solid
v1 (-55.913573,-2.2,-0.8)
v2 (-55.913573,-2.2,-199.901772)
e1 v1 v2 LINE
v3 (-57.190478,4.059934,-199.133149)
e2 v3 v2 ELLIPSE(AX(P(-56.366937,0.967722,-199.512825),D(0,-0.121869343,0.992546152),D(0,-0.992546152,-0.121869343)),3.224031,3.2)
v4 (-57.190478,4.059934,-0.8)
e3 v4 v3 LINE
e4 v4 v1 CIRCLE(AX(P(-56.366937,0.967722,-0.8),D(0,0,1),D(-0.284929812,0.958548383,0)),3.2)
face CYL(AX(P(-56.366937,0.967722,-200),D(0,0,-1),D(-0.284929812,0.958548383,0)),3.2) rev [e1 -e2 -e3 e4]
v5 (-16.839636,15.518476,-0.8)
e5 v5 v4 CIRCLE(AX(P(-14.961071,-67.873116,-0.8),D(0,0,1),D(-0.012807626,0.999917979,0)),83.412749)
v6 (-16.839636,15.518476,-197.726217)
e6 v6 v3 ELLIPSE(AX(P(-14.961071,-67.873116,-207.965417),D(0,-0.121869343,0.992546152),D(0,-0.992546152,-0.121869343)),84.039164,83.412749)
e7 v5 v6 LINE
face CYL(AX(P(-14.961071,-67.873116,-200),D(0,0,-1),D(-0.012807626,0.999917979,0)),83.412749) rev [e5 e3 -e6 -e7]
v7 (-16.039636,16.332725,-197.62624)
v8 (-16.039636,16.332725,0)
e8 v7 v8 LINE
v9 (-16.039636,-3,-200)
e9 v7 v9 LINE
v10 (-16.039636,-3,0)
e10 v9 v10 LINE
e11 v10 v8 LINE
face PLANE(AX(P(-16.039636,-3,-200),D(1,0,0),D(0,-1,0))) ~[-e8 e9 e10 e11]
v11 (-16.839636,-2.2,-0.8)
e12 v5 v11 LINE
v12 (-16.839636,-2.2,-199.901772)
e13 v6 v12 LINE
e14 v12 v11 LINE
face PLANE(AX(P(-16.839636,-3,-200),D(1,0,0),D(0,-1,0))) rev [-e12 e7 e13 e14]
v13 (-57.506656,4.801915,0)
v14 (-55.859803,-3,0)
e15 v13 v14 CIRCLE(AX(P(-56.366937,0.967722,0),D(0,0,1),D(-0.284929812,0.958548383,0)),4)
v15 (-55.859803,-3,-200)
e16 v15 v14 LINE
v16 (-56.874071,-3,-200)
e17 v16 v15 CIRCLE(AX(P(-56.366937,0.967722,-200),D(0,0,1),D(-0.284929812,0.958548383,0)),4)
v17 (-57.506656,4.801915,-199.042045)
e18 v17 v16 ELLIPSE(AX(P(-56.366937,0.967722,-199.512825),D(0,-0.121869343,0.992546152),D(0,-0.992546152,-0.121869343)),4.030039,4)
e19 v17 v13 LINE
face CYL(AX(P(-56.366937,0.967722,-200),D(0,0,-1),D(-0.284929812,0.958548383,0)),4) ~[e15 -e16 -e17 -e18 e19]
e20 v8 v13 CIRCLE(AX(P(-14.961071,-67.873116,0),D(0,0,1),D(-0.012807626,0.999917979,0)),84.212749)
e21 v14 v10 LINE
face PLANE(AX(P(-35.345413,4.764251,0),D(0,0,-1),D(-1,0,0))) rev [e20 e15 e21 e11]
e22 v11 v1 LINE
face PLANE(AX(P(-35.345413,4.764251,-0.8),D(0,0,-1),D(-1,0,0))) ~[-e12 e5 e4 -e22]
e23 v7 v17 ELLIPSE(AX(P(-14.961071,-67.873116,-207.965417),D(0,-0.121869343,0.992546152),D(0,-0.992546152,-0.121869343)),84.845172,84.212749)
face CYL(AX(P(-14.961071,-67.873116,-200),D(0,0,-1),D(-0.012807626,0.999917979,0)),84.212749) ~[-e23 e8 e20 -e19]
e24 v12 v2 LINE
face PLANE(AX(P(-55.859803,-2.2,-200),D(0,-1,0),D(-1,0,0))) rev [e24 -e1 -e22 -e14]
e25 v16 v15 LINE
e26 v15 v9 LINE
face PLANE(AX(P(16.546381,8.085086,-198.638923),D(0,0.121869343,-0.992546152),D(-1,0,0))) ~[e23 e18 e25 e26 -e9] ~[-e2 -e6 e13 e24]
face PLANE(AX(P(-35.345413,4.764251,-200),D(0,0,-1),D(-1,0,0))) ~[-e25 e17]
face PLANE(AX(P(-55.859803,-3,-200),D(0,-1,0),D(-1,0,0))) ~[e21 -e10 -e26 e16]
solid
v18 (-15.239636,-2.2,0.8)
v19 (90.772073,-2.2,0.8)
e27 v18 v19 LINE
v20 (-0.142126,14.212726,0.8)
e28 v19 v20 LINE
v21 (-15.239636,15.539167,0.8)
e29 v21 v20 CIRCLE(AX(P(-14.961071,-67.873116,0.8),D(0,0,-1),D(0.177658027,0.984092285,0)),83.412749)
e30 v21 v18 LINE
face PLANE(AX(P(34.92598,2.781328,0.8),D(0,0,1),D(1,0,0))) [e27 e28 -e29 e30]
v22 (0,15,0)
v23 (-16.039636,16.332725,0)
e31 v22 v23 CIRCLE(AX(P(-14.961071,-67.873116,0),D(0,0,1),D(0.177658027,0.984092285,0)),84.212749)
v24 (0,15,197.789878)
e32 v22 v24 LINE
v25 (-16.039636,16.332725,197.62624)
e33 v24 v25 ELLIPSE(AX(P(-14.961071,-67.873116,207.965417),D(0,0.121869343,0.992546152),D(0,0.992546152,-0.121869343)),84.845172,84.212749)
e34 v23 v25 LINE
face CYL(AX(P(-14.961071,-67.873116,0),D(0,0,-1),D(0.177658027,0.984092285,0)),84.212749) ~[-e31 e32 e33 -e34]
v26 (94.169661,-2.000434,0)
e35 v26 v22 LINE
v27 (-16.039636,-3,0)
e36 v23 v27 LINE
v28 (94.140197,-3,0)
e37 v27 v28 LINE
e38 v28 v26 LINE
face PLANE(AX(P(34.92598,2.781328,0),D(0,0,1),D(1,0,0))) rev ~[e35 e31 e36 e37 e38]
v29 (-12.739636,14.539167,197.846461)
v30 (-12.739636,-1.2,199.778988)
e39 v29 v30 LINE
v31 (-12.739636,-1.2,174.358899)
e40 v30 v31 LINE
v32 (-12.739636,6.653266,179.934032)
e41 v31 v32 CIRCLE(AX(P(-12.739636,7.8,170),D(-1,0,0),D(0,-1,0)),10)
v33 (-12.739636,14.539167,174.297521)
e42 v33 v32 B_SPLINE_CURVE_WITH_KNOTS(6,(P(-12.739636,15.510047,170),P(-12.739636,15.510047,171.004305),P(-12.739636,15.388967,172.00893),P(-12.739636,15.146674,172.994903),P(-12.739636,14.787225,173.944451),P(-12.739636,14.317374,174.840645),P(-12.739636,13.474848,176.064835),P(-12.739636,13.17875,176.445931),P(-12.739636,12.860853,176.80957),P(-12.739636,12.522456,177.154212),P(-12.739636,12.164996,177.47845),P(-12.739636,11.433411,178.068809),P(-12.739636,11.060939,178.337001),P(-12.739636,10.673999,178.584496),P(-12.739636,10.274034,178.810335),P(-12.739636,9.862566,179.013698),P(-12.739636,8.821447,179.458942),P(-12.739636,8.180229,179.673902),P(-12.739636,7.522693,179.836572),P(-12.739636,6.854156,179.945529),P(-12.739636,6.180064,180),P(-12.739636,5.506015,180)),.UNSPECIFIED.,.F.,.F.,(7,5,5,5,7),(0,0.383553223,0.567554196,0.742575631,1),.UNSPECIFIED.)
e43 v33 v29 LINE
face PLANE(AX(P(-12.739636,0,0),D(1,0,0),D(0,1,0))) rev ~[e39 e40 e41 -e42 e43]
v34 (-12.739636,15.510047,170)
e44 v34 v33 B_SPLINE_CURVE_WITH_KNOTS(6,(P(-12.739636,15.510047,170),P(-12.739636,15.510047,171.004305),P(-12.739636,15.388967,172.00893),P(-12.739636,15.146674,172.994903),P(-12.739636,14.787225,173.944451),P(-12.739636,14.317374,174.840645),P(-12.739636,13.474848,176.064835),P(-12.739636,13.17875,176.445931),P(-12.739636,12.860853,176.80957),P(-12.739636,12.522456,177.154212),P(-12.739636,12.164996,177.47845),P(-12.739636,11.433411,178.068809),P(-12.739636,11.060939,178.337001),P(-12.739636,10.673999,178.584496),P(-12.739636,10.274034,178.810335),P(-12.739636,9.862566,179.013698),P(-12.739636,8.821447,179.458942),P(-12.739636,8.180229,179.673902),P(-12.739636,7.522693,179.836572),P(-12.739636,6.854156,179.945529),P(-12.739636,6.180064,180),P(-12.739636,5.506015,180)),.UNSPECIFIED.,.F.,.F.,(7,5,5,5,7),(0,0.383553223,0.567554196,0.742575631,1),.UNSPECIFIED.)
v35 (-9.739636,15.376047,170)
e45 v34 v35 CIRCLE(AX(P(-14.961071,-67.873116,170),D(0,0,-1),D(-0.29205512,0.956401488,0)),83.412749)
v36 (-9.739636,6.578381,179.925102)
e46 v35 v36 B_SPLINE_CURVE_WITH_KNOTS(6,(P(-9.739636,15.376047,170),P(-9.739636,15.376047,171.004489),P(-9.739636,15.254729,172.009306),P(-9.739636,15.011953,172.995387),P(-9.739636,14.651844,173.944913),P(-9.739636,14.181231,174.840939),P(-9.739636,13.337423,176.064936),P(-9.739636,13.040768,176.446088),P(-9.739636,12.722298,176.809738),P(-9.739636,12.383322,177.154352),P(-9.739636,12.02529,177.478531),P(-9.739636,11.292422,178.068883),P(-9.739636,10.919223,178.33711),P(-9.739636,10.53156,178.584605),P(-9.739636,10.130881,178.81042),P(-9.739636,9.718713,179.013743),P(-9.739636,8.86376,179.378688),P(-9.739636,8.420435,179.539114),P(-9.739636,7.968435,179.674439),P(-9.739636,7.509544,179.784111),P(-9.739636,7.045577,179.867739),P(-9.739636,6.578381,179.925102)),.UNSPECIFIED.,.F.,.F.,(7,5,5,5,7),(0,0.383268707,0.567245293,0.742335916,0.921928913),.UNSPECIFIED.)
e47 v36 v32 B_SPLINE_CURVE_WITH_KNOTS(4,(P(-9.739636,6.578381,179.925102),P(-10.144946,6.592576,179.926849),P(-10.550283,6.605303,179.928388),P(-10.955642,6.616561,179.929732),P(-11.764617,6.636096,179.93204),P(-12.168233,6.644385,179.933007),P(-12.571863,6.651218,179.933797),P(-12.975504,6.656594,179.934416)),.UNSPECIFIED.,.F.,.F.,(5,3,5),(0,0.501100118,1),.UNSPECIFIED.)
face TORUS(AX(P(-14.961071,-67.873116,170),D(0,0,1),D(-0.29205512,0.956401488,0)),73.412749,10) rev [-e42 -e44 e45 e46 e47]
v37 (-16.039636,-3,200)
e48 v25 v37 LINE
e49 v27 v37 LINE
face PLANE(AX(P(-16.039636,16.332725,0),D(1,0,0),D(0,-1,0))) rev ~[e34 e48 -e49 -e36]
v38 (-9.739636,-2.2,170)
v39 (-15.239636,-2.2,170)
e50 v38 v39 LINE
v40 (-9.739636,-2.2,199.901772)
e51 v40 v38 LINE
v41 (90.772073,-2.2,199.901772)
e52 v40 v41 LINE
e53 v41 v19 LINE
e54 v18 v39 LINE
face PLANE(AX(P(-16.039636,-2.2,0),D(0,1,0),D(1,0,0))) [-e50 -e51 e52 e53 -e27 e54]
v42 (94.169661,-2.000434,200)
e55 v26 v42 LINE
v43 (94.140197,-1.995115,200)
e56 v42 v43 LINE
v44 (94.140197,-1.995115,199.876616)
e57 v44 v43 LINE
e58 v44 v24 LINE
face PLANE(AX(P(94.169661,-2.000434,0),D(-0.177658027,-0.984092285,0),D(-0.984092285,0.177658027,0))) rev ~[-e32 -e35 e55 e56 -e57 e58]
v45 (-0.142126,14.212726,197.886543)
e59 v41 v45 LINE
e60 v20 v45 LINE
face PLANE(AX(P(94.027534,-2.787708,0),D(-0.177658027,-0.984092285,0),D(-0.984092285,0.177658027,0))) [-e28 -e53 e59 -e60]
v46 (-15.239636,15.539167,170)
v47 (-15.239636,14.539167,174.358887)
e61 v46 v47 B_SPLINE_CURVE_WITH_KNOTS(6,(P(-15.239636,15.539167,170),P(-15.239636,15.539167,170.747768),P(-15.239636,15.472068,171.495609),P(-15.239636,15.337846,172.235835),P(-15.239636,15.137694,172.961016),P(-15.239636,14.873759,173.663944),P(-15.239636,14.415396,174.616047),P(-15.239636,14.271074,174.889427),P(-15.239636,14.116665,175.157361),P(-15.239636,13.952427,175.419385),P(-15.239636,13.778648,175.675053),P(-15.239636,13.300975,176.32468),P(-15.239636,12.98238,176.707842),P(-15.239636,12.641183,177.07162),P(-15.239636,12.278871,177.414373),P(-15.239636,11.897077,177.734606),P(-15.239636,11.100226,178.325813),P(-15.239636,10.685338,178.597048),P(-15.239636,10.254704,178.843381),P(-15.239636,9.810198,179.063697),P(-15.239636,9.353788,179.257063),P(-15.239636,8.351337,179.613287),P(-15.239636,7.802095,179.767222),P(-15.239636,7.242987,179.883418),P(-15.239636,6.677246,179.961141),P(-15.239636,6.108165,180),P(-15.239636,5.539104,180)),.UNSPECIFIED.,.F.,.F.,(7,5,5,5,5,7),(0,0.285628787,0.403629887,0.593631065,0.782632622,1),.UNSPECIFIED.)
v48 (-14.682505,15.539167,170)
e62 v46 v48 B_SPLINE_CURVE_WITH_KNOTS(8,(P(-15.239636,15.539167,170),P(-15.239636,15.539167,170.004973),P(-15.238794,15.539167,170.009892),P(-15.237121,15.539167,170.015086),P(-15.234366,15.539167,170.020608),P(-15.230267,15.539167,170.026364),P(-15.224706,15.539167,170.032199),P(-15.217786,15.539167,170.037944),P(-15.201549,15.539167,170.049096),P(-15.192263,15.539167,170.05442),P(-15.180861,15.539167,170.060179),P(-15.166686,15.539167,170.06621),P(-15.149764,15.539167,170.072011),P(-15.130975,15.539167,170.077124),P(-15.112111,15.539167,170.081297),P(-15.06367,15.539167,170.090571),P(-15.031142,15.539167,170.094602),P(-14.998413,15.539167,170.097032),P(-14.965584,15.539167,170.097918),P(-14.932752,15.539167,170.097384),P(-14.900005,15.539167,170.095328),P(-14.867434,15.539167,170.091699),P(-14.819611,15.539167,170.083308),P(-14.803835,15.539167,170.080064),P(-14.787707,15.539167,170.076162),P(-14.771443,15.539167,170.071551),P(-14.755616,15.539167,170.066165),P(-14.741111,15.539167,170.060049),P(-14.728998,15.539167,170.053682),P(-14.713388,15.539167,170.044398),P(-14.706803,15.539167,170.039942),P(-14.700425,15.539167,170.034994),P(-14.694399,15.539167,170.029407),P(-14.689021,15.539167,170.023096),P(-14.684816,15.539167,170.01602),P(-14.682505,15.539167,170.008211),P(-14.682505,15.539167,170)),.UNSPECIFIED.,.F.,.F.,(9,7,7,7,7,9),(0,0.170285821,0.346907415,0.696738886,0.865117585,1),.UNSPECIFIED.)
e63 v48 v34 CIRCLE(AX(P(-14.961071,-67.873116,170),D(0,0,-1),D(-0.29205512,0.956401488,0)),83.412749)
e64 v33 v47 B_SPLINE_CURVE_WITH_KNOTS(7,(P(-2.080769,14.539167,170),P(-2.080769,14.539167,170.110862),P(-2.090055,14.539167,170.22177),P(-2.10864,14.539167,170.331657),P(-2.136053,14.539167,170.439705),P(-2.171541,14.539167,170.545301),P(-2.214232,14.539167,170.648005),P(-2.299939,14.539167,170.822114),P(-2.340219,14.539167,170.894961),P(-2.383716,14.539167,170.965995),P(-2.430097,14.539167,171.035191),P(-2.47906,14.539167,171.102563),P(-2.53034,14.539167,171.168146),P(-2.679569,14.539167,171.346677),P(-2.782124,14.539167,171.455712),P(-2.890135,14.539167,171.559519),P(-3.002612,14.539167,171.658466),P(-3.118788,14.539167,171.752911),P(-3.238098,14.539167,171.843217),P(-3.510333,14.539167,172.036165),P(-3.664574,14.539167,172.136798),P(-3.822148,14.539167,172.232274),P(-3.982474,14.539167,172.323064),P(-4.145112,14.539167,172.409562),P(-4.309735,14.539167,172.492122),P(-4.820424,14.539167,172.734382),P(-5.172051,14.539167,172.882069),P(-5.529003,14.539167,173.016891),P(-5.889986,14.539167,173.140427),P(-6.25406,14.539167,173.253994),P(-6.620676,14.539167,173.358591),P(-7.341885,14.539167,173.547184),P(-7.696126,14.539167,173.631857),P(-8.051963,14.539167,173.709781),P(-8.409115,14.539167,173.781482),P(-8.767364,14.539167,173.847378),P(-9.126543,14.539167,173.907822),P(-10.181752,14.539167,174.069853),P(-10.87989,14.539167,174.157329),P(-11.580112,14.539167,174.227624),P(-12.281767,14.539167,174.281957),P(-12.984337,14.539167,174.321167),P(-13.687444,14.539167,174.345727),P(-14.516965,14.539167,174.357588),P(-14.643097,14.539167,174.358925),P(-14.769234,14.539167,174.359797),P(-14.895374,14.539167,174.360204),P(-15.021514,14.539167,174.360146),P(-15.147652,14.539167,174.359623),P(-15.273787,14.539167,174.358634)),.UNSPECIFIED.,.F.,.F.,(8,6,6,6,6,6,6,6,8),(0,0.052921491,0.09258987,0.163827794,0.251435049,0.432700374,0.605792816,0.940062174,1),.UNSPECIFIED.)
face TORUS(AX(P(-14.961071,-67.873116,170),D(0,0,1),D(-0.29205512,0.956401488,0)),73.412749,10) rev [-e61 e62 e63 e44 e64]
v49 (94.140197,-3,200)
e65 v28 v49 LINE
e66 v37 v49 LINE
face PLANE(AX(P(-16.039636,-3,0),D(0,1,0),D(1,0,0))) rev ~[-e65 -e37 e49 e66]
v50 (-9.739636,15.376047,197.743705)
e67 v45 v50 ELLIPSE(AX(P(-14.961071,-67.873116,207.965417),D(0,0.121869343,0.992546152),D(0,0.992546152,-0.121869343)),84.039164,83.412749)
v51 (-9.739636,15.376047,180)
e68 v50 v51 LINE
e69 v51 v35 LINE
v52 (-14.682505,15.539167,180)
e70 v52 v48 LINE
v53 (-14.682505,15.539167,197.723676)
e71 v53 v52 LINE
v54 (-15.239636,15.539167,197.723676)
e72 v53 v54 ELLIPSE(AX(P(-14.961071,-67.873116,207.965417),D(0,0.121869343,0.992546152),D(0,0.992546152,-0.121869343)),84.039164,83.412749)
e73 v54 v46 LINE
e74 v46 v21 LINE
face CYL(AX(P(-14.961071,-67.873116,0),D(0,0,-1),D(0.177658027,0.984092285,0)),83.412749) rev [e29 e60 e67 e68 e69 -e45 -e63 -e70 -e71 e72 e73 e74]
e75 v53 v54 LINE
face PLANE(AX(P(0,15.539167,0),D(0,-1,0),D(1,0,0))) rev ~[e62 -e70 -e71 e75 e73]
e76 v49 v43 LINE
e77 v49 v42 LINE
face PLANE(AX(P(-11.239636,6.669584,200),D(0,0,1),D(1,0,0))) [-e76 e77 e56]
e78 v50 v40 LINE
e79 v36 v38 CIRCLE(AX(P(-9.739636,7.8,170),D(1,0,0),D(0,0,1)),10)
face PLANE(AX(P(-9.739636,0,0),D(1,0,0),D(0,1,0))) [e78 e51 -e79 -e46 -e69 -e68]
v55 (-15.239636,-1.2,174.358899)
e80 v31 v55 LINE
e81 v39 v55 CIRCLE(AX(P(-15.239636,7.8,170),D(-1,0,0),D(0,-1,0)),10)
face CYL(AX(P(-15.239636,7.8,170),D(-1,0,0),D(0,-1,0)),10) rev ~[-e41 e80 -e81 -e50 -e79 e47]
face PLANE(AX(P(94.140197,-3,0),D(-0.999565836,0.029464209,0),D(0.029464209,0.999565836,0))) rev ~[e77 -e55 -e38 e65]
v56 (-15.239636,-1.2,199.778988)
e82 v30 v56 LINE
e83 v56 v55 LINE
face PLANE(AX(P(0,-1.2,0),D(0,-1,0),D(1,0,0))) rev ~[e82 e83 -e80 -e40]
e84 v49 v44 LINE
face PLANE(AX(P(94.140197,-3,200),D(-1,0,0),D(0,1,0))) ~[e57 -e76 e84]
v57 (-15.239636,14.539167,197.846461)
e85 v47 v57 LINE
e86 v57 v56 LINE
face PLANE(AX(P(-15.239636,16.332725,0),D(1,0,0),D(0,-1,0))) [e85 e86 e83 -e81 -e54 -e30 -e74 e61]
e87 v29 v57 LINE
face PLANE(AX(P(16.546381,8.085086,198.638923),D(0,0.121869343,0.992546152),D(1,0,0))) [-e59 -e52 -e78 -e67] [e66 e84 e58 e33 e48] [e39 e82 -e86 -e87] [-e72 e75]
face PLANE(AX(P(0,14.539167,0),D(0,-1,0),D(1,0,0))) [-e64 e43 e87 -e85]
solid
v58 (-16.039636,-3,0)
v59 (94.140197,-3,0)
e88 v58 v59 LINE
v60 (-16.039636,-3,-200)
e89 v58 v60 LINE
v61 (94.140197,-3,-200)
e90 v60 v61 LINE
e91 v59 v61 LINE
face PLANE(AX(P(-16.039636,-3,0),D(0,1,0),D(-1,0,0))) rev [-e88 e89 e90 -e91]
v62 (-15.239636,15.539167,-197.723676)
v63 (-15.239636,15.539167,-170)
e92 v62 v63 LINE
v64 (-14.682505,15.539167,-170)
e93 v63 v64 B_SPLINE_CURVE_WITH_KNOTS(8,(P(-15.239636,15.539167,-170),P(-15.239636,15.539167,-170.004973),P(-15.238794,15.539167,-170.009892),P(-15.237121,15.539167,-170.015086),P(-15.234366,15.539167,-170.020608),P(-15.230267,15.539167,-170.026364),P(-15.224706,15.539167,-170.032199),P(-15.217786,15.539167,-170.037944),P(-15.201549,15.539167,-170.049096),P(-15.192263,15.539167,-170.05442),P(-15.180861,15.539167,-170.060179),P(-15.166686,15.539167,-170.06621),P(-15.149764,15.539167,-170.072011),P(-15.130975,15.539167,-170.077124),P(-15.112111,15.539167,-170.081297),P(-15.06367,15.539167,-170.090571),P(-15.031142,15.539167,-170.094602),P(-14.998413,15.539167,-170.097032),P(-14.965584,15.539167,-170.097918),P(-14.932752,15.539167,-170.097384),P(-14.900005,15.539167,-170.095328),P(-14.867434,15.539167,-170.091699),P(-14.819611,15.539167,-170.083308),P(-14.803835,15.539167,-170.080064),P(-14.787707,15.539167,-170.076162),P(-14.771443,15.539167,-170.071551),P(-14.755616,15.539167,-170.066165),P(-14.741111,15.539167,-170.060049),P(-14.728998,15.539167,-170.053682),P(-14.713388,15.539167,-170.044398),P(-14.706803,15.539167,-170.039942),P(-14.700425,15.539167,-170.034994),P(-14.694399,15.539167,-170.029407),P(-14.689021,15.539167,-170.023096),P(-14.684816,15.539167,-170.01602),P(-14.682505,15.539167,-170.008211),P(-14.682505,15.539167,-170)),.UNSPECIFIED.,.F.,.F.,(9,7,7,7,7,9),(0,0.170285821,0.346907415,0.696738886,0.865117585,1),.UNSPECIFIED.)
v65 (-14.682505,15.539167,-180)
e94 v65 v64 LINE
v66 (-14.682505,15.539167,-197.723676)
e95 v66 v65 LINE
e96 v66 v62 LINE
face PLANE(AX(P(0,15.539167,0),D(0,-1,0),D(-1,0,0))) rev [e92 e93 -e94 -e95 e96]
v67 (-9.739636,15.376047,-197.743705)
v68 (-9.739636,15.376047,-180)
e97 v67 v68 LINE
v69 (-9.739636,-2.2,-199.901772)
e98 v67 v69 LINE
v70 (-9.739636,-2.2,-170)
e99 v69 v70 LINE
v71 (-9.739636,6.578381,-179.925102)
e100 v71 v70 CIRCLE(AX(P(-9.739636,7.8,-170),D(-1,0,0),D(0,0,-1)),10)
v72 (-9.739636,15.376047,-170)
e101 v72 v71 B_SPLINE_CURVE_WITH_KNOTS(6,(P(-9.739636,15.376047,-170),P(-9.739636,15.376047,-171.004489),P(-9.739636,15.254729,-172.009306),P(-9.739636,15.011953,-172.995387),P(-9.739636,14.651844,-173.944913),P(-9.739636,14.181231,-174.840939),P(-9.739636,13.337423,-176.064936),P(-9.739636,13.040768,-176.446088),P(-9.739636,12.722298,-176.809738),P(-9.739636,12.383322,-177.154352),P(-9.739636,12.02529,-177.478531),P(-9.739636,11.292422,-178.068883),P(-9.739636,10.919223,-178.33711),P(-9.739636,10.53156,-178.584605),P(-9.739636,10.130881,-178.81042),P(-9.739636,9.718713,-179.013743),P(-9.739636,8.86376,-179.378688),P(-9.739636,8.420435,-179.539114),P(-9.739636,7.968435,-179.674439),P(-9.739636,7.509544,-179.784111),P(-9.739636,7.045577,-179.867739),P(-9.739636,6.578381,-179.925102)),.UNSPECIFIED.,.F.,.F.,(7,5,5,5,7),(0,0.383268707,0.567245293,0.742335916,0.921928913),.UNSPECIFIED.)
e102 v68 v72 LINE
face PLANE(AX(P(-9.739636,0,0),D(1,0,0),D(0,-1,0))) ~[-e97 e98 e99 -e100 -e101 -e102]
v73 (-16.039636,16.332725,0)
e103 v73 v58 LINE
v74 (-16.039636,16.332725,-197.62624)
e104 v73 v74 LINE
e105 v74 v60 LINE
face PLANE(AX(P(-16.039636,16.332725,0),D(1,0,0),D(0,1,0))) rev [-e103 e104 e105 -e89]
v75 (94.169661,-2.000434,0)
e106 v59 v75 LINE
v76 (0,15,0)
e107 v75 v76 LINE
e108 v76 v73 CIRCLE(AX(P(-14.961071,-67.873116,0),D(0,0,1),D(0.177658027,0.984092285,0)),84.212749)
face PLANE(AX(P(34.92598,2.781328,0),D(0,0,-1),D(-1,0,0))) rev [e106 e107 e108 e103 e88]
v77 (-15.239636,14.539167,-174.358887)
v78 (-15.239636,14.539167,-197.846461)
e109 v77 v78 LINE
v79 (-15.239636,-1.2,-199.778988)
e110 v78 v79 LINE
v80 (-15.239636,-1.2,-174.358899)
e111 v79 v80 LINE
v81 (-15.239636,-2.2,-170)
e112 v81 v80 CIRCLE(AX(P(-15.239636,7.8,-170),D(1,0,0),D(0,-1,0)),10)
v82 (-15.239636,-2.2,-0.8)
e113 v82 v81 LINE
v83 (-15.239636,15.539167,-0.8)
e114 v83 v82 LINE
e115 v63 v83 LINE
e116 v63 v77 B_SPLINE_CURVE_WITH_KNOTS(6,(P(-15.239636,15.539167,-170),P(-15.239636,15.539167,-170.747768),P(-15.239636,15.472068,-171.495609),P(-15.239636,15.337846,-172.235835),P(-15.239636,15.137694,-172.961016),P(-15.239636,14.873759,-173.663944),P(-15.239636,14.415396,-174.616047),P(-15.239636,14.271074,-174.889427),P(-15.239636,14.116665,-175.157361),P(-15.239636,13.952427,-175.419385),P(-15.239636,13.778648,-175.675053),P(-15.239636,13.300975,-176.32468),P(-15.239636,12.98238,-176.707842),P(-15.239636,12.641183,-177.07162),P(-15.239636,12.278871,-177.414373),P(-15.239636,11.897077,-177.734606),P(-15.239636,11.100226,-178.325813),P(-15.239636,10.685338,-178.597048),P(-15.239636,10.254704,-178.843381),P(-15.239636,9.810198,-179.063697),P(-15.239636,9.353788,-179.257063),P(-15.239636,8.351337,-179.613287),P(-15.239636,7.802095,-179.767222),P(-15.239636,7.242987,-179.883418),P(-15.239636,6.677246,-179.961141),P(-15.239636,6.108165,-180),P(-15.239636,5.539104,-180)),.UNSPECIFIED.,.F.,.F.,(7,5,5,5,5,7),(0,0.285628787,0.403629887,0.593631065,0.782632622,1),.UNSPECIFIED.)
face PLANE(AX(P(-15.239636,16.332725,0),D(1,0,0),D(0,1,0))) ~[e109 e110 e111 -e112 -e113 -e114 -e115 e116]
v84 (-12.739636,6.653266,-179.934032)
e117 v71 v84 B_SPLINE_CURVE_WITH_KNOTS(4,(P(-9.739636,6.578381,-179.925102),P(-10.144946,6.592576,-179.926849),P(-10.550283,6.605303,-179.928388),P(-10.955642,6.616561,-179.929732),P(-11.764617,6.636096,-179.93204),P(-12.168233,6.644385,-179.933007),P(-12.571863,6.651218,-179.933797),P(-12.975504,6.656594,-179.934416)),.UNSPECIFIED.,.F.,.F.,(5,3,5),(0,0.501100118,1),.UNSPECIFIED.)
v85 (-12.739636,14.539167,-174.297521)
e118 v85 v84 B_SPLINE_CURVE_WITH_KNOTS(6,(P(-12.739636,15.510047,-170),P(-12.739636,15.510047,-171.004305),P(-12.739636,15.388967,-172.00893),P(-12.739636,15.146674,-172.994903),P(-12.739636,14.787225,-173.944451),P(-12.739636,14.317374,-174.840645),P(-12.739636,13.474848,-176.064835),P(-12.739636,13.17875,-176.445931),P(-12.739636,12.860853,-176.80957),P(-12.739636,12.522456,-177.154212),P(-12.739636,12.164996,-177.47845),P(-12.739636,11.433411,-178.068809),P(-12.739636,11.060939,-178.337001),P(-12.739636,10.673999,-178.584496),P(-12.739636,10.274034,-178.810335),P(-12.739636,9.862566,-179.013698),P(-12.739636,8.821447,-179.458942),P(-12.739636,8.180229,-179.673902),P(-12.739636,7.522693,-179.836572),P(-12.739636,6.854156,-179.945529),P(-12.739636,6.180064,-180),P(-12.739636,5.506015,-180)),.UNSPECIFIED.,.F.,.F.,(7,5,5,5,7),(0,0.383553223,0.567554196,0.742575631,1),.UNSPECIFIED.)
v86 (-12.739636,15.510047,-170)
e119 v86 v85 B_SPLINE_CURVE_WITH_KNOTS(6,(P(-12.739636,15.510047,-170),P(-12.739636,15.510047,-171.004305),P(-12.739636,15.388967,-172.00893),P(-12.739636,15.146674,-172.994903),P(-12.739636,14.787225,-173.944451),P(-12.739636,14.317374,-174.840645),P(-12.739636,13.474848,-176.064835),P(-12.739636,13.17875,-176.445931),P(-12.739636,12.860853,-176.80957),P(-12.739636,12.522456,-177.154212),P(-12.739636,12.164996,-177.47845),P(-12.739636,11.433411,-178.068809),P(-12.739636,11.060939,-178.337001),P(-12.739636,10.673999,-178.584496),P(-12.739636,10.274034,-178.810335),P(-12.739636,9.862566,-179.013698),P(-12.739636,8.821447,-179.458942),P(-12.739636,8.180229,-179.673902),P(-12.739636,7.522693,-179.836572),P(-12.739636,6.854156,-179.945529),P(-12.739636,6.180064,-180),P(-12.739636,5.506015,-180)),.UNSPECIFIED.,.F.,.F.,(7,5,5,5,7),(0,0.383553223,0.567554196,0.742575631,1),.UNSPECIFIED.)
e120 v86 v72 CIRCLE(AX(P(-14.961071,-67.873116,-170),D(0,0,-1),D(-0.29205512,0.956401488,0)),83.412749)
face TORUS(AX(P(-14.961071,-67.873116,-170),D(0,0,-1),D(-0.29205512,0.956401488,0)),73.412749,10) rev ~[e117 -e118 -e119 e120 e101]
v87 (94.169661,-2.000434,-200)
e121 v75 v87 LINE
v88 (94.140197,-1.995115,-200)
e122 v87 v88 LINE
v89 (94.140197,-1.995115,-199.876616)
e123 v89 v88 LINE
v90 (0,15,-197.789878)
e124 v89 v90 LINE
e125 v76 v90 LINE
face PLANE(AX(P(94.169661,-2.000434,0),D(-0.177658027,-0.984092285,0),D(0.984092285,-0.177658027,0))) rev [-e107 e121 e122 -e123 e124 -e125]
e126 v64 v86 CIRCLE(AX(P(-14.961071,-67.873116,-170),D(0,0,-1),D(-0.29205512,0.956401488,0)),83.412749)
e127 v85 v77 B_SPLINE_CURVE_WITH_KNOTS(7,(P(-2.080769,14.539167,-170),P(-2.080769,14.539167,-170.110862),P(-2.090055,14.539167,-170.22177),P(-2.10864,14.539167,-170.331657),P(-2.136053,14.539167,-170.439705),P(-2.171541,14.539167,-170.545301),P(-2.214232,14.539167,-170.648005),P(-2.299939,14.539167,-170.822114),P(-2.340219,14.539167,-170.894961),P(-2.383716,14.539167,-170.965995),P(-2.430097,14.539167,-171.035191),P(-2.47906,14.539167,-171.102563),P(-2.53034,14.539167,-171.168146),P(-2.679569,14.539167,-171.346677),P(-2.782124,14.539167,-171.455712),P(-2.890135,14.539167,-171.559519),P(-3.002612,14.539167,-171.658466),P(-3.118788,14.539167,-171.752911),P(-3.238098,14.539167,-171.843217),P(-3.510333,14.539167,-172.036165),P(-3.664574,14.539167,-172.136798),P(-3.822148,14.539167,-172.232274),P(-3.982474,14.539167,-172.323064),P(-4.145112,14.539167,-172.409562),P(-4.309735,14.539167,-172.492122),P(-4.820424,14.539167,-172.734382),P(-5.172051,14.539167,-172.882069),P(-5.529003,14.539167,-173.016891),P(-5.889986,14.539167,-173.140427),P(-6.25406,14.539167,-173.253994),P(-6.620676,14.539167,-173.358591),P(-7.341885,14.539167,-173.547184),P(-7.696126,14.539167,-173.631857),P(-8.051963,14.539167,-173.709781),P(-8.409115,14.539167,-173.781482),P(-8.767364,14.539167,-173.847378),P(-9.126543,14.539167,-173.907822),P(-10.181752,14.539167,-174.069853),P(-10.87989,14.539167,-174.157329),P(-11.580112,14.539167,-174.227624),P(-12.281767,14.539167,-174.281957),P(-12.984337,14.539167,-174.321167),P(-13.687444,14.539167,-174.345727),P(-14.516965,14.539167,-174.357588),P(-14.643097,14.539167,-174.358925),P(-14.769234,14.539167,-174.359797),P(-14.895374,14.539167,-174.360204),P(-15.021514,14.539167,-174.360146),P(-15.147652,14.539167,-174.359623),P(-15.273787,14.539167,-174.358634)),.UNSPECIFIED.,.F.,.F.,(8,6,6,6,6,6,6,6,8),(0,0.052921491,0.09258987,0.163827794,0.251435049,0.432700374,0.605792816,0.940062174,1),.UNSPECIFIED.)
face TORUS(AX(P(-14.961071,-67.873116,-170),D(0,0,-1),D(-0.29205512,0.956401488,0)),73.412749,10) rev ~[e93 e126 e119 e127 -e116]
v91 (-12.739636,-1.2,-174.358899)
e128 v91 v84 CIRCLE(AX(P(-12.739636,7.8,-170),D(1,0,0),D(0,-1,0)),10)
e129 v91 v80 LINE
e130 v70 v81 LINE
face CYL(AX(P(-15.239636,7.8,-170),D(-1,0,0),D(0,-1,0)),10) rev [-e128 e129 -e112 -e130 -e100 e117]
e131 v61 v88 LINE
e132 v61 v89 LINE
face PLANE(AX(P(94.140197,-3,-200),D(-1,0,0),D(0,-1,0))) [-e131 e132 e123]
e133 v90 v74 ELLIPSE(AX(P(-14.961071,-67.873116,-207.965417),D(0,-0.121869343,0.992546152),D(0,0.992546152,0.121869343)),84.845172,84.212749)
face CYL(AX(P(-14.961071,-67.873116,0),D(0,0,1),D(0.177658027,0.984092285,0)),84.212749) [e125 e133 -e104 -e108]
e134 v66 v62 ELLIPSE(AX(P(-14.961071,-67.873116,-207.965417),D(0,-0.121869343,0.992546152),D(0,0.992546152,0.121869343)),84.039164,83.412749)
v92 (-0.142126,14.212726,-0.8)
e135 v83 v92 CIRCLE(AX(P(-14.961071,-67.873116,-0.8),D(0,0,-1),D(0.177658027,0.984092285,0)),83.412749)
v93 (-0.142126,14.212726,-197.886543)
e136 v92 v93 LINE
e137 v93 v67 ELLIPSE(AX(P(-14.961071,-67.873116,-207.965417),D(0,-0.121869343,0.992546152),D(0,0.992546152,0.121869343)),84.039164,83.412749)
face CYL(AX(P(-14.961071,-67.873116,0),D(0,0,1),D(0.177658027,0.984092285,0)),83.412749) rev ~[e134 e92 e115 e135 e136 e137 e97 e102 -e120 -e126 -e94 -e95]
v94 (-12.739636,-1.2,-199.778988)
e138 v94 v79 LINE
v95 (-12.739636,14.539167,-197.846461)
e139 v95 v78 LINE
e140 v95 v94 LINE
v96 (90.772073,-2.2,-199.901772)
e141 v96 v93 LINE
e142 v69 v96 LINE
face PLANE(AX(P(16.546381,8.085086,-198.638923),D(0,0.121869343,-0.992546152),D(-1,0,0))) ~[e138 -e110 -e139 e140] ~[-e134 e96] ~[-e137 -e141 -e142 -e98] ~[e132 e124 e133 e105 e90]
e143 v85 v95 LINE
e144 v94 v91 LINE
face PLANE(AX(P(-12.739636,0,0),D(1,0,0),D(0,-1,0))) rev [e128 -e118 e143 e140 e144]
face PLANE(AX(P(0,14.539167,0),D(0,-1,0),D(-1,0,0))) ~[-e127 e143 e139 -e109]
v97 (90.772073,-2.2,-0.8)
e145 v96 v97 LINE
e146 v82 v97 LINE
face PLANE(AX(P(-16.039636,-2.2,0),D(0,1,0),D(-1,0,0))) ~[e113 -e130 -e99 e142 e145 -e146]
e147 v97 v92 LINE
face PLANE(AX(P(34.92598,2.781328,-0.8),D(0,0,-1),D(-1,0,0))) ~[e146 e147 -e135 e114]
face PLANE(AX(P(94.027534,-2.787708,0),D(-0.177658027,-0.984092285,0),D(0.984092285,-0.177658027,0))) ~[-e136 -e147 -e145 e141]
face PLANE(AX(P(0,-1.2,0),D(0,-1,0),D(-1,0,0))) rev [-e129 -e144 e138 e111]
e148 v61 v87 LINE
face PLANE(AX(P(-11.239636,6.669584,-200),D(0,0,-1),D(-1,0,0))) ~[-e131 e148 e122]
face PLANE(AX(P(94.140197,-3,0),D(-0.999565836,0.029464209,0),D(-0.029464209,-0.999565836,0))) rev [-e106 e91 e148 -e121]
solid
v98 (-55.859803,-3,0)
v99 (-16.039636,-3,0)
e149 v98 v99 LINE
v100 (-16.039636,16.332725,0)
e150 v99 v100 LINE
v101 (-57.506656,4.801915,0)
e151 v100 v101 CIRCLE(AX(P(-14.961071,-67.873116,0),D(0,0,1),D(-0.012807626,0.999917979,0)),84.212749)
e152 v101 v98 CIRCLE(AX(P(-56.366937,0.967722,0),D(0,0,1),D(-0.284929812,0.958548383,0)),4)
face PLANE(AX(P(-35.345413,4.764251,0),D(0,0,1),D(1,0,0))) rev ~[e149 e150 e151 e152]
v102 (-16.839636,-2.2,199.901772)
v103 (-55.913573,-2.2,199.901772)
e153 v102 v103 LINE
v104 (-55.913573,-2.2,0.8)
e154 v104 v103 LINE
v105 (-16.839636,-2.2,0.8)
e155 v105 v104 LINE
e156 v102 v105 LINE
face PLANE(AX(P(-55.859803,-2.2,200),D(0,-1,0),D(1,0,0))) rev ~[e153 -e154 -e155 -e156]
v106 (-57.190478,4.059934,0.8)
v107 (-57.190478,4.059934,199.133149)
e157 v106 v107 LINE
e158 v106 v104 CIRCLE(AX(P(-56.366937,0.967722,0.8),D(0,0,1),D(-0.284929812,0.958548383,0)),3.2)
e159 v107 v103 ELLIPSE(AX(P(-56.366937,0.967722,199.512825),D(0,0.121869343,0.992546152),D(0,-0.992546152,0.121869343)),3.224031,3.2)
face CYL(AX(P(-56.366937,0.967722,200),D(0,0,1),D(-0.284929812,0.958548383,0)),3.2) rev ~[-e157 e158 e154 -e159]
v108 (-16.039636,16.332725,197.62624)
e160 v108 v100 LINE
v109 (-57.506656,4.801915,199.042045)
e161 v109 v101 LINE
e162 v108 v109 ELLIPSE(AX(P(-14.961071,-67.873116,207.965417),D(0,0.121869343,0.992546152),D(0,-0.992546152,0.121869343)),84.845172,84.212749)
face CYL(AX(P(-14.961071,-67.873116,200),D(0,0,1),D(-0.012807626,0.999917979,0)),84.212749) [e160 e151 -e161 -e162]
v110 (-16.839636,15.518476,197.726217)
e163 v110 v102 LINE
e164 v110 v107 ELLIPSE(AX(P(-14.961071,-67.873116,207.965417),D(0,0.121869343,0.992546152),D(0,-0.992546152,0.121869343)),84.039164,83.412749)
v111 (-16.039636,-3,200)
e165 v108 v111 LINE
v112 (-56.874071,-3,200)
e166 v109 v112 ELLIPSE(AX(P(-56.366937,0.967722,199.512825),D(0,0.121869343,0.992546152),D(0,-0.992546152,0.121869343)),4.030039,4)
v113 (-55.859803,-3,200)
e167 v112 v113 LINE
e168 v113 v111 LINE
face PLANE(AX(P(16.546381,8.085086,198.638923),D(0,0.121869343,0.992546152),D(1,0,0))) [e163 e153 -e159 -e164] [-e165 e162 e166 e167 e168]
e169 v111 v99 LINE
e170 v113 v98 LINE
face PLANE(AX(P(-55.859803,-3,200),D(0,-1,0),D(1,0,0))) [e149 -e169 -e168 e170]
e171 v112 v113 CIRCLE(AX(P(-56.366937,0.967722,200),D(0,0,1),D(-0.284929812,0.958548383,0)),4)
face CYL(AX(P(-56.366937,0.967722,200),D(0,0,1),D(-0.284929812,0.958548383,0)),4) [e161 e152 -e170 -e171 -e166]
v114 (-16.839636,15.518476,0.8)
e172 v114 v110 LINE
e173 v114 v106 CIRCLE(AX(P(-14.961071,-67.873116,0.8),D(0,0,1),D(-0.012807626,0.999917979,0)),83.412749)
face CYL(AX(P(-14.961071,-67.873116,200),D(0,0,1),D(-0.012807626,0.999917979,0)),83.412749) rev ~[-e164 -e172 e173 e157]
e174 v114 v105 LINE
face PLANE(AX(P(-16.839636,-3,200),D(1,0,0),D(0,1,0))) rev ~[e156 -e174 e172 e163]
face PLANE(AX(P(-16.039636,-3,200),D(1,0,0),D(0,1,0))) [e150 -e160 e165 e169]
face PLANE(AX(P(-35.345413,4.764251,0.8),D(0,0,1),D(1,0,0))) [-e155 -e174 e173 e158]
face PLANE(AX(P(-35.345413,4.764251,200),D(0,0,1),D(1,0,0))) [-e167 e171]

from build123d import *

# Parameters (mm, degrees)
F1_DEPTH     = 200
F3_DEPTH     = 200
F4_T         = -0.8
F4_2_T       = -0.8
F5_W         = 2.5
F5_H         = 1
F6_DEPTH     = 20
F7_T4_DEPTH  = 5.5
F7_T9_DEPTH  = 30.5
F7_T14_ANGLE = 37.7423343373
F7_T20_ANGLE = 37.7423343373
F8_W         = 155.1876314091
F8_H         = 22.3366669118
F9_ANGLE     = 7


# Not quite as in the source:
# - a fillet or chamfer that OpenCascade refuses, or shapes differently, is made with other operations: its cross-section is extruded or revolved along the edge and cut away or added


with BuildPart() as f1:
    # F0 (on Top) → F1 (new body)
    with BuildSketch(Plane.XY):
        with BuildLine():
            Line((94.1401966023, -3), (94.1696608117, -2.0004341641))
            Line((94.1696608117, -2.0004341641), (0, 15))
            ThreePointArc((0, 15), (-7.9879059152, 16.0504323354), (-16.0396361483, 16.3327251865))
            Line((-16.0396361483, 16.3327251865), (-16.0396361483, -3))
            Line((-16.0396361483, -3), (94.1401966023, -3))
        make_face()
    extrude(amount=F1_DEPTH)

    # F4
    f4_openings = [f1.faces().sort_by_distance(p)[0] for p in [
        (22.614044, 3.891358, 200),
    ]]
    offset(amount=F4_T, openings=f4_openings)

    # F5 (on face) → F6 (join)
    with BuildSketch(Plane.XY.offset(200)):
        Polygon((-12.7396361483, -1.2), (-12.7396361483, -2.2), (-9.7396361483, -2.2), (-9.7396361483, 15.5391672506), (-12.7396361483, 15.5391672506), (-12.7396361483, 14.5391672506), align=None)
        with Locations((-13.9896361483, -1.7)):
            Rectangle(F5_W, F5_H)
        with Locations((-13.9896361483, 15.0391672506)):
            Rectangle(F5_W, F5_H)
    extrude(amount=-F6_DEPTH)

    # F7: fillet of radius 10 on 2 edges, made by hand


with BuildPart() as f3:
    # F2 (on face) → F3 (new body)
    with BuildSketch(Plane.XY.offset(200)):
        with BuildLine():
            Line((-16.0396361483, -3), (-16.0396361483, 16.3327251865))
            ThreePointArc((-16.0396361483, 16.3327251865), (-37.5222437907, 13.2612199418), (-57.5066562048, 4.8019152395))
            ThreePointArc((-57.5066562048, 4.8019152395), (-60.2806962129, 0.1415930949), (-55.8598033977, -3))
            Line((-55.8598033977, -3), (-16.0396361483, -3))
        make_face()
    extrude(amount=-F3_DEPTH)

    # F4#2
    f4_2_openings = [f3.faces().sort_by_distance(p)[0] for p in [
        (-34.83961, 5.023506, 200),
    ]]
    offset(amount=F4_2_T, openings=f4_2_openings, kind=Kind.INTERSECTION)


with BuildPart() as f7_tool2:
    # F7_s3 → F7_t4 (new body)
    with BuildSketch(Plane.YZ.offset(-15.2396361483)):
        with BuildLine():
            ThreePointArc((-2.2, 170), (0.7289321881, 177.0710678119), (7.8, 180))
            Line((7.8, 180), (-2.2, 180))
            Line((-2.2, 180), (-2.2, 170))
        make_face()
    extrude(amount=F7_T4_DEPTH)

    split(bisect_by=Plane.XZ.offset(1.2), keep=Keep.TOP)


with BuildPart() as f1_1:
    add(f1.part)

    # F7_t1: union F7_tool2
    add(f7_tool2.part)


with BuildPart() as f7_tool7:
    # F7_s8 → F7_t9 (new body)
    with BuildSketch(Plane.YZ.offset(-40.2396361483)):
        with BuildLine():
            ThreePointArc((-2.2, 170), (0.7289321881, 177.0710678119), (7.8, 180))
            Line((7.8, 180), (-2.2, 180))
            Line((-2.2, 180), (-2.2, 170))
        make_face()
    extrude(amount=F7_T9_DEPTH)

    split(bisect_by=Plane.YZ.offset(-12.7396361483), keep=Keep.TOP)


with BuildPart() as f1_2:
    add(f1_1.part)

    # F7_t6: union F7_tool7
    add(f7_tool7.part)


with BuildPart() as f7_tool12:
    # F7_s13 → F7_t14 (revolve)
    with BuildSketch(Plane(origin=(-32.6433997569, -9.9682739464, 0), x_dir=(0, 0, 1), z_dir=(-0.9564014883, -0.2920551201, 0))):
        with BuildLine():
            ThreePointArc((170, 22.8682565899), (177.0710678119, 19.9393244018), (180, 12.8682565899))
            Line((180, 12.8682565899), (180, 22.8682565899))
            Line((180, 22.8682565899), (170, 22.8682565899))
        make_face()
    revolve(axis=Axis((-14.9610707823, -67.8731164952, 180), (0, 0, -1)), revolution_arc=F7_T14_ANGLE)

    split(bisect_by=Plane.YZ.offset(-12.7396361483), keep=Keep.TOP)

    split(bisect_by=Plane.YZ.offset(-9.7396361483), keep=Keep.BOTTOM)


with BuildPart() as f1_3:
    add(f1_2.part)

    # F7_t11: union F7_tool12
    add(f7_tool12.part)


with BuildPart() as f7_tool18:
    # F7_s19 → F7_t20 (revolve)
    with BuildSketch(Plane(origin=(-32.6433997569, -9.9682739464, 0), x_dir=(0, 0, 1), z_dir=(-0.9564014883, -0.2920551201, 0))):
        with BuildLine():
            ThreePointArc((170, 22.8682565899), (177.0710678119, 19.9393244018), (180, 12.8682565899))
            Line((180, 12.8682565899), (180, 22.8682565899))
            Line((180, 22.8682565899), (170, 22.8682565899))
        make_face()
    revolve(axis=Axis((-14.9610707823, -67.8731164952, 180), (0, 0, -1)), revolution_arc=F7_T20_ANGLE)

    split(bisect_by=Plane.YZ.offset(-15.2396361483), keep=Keep.TOP)

    split(bisect_by=Plane.XZ.offset(-14.5391672506), keep=Keep.BOTTOM)

    split(bisect_by=Plane.XZ.offset(-15.5391672506), keep=Keep.TOP)

    split(bisect_by=Plane.YZ.offset(-9.7396361483), keep=Keep.BOTTOM)


with BuildPart() as f1_4:
    add(f1_3.part)

    # F7_t17: union F7_tool18
    add(f7_tool18.part)


with BuildPart() as f9_tool:
    # F8 (on face) → F9 (revolve)
    with BuildSketch(Plane.XY.offset(200)):
        with Locations((16.5463808977, 8.1683334559)):
            Rectangle(F8_W, F8_H)
    revolve(axis=Axis((16.5463808977, -3, 200), (-1, 0, 0)), revolution_arc=F9_ANGLE)


with BuildPart() as f1_5:
    add(f1_4.part)

    # F9: cut by f9_tool
    add(f9_tool.part, mode=Mode.SUBTRACT)


with BuildPart() as f3_1:
    add(f3.part)

    # F9: cut by f9_tool
    add(f9_tool.part, mode=Mode.SUBTRACT)


with BuildPart() as f10_1:
    # F10: instance of F1
    add(f1_5.part.mirror(Plane.XY))


with BuildPart() as f10_2:
    # F10: instance of F3
    add(f3_1.part.mirror(Plane.XY))


solid = Compound([f1_5.part, f3_1.part, f10_1.part, f10_2.part])
